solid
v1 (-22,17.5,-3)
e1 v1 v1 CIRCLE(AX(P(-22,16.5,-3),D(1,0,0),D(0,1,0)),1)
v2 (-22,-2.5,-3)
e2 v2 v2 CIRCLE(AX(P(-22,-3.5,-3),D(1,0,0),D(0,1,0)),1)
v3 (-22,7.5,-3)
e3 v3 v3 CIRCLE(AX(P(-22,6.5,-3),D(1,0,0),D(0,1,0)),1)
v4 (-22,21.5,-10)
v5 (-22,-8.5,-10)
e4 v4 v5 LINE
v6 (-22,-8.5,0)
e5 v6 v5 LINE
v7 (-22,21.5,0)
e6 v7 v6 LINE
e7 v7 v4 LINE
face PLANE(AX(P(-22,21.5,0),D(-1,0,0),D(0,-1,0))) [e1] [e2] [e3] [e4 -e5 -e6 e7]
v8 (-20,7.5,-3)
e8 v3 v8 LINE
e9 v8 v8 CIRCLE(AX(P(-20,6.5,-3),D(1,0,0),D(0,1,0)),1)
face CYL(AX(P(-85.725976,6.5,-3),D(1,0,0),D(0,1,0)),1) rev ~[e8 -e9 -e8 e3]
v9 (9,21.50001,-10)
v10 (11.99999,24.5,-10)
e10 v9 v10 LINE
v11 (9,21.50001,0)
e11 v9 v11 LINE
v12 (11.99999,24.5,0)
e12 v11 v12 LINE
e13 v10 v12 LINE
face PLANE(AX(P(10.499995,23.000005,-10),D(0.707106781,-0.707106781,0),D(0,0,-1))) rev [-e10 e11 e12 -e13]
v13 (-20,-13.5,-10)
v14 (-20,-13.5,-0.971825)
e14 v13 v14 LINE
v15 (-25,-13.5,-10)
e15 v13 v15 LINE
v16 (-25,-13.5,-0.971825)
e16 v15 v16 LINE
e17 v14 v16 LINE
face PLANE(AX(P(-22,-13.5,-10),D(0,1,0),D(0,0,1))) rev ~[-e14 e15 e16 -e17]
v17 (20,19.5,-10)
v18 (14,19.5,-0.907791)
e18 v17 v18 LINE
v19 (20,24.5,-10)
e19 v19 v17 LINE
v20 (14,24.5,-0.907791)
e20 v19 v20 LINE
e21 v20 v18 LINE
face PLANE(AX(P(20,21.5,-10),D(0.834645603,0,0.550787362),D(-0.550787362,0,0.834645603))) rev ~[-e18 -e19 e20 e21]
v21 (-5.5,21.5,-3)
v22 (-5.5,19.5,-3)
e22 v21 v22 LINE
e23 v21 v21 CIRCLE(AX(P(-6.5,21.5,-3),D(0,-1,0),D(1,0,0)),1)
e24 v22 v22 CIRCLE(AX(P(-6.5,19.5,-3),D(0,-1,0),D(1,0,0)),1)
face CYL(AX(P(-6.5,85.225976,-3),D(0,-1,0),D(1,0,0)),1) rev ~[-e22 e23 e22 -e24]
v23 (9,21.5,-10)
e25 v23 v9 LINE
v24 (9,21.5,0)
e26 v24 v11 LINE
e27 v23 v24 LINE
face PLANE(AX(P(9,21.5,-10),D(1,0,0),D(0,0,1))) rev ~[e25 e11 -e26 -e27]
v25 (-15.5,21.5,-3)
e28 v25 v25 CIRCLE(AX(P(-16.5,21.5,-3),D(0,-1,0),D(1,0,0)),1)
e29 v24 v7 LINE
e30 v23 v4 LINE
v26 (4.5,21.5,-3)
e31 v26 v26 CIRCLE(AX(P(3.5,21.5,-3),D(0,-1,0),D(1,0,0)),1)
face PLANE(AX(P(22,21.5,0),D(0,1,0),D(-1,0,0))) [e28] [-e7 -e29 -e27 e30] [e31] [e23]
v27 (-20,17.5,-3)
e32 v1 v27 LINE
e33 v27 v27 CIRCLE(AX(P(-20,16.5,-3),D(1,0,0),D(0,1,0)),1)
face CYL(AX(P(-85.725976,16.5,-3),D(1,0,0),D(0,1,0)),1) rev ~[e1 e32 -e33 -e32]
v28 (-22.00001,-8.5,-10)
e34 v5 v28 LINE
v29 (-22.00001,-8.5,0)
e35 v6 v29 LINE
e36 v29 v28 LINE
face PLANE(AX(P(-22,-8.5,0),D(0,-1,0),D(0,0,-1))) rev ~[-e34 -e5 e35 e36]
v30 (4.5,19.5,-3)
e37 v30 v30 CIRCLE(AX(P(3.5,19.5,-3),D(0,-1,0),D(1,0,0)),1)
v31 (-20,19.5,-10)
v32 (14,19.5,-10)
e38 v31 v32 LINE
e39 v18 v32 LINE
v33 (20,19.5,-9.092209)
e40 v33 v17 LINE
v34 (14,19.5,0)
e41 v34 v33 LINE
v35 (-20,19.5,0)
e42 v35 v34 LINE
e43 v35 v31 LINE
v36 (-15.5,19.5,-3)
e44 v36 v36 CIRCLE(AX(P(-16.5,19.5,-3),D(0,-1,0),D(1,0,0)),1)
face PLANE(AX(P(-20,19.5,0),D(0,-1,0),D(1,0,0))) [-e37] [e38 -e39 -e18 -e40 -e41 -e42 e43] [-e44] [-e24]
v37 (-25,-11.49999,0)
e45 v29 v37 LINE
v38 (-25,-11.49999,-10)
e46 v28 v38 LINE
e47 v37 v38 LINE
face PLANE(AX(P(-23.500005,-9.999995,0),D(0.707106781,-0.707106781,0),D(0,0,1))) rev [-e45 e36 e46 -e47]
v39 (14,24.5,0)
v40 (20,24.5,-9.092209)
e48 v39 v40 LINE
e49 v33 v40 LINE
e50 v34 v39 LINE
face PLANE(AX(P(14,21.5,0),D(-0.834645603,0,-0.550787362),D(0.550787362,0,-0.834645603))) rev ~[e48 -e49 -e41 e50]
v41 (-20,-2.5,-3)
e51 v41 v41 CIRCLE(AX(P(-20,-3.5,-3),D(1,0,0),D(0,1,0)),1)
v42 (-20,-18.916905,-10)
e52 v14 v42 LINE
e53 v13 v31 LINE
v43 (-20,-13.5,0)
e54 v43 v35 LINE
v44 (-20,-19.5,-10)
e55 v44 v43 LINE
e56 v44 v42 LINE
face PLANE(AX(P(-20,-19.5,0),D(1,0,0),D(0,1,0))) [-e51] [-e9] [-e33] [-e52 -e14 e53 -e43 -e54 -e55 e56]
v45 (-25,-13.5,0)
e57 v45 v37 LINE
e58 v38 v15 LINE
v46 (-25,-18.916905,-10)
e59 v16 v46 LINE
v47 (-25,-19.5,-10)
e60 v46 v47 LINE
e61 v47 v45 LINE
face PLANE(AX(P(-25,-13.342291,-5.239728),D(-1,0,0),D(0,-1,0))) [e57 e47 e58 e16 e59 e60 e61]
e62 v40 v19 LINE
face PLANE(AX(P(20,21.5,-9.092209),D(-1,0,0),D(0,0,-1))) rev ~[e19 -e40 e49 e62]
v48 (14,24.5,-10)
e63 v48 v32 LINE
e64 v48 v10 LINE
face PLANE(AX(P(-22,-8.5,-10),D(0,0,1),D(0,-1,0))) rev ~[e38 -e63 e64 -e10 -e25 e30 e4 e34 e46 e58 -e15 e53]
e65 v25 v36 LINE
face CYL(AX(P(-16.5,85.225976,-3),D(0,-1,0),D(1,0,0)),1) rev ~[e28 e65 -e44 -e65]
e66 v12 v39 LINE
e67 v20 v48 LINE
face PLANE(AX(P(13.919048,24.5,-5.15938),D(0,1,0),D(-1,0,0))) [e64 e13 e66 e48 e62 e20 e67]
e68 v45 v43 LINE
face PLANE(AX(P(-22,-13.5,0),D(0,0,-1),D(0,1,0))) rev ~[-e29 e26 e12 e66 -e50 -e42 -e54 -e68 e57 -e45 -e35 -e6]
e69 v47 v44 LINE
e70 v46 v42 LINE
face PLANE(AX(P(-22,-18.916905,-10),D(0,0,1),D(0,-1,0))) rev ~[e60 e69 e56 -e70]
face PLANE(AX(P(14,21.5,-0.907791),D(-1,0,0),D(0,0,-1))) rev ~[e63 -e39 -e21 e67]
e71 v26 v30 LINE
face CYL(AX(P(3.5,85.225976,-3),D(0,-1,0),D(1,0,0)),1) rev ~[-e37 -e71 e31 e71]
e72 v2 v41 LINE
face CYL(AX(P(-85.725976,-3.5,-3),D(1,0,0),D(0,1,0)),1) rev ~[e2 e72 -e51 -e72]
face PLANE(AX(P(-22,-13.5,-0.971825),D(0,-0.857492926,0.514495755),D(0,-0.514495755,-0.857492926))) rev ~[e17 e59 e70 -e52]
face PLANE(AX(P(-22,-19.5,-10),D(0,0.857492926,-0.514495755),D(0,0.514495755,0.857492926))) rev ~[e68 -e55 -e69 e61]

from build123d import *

# Parameters (mm, degrees)
F1_DEPTH  = 10
F2_W      = 2
F2_H      = 10
F3_DEPTH  = 25
F4_DEPTH  = 44.001
F6_DEPTH  = 41.001
F9_DEPTH  = 3
F10_SIZE  = 2.99999
F12_DEPTH = 3
F13_SIZE  = 2.99999
F16_D     = 2
F17_D     = 2


# Not quite as in the source:
# - a fillet or chamfer is up to 0.001 mm smaller than in the source, because OpenCascade refuses the exact size
# - a feature of the source that left no trace in its solid (it failed there, or was rolled back) is left out


with BuildPart() as f1:
    # F0 (on Top) → F1 (new body)
    with BuildSketch(Plane.XY):
        Polygon((-22, -19.5), (-20, -19.5), (-20, 19.5), (20, 19.5), (20, 21.5), (-22, 21.5), align=None)
        Polygon((20, 19.5), (20, -19.5), (-20, -19.5), (-22, -19.5), (-22, -21.5), (22, -21.5), (22, 21.5), (20, 21.5), align=None)
    extrude(amount=-F1_DEPTH)

    # F2 (on face) → F3 (cut)
    with BuildSketch(Plane(origin=(-22, 0, 0), x_dir=(0, -1, 0), z_dir=(-1, 0, 0))):
        with Locations((20.5, -5)):
            Rectangle(F2_W, F2_H)
        Polygon((13.5, -10), (18.9169048105, -10), (13.5, -0.9718253158), align=None)
    extrude(amount=-F3_DEPTH, mode=Mode.SUBTRACT)

    # F2 (on face) → F4 (cut, through all)
    with BuildSketch(Plane(origin=(-22, 0, 0), x_dir=(0, -1, 0), z_dir=(-1, 0, 0))):
        Polygon((19.5, 0), (13.5, 0), (19.5, -10), align=None)
        with Locations((20.5, -5)):
            Rectangle(F2_W, F2_H)
    extrude(amount=-F4_DEPTH, mode=Mode.SUBTRACT)

    # F5 (on face) → F6 (cut, through all)
    with BuildSketch(Plane(origin=(0, 21.5, 0), x_dir=(-1, 0, 0), z_dir=(0, 1, 0))):
        Polygon((-14, -0.9077913453), (-20, -10), (-14, -10), align=None)
        Polygon((-22, -10), (-20, -10), (-20, -9.0922086547), (-14, 0), (-22, 0), align=None)
    extrude(amount=-F6_DEPTH, mode=Mode.SUBTRACT)

    # F8 (on face) → F9 (join)
    with BuildSketch(Plane(origin=(0, 21.5, 0), x_dir=(-1, 0, 0), z_dir=(0, 1, 0))):
        Polygon((-14, -10), (-9, -10), (-9, 0), (-14, 0), (-20, -9.0922086547), (-20, -10), (-14, -0.9077913453), align=None)
    extrude(amount=F9_DEPTH)

    # F10 (size 3 in the source; OpenCascade refuses exactly that, so slightly less here)
    f10_edges = [f1.edges().sort_by_distance(p)[0] for p in [
        (9, 24.5, -5),
    ]]
    chamfer(f10_edges, length=F10_SIZE)

    # F11 (on face) → F12 (join)
    with BuildSketch(Plane(origin=(-22, 0, 0), x_dir=(0, -1, 0), z_dir=(-1, 0, 0))):
        Polygon((13.5, 0), (8.5, 0), (8.5, -10), (13.5, -10), (13.5, -0.9718253158), (18.9169048105, -10), (19.5, -10), align=None)
    extrude(amount=F12_DEPTH)

    # F13 (size 3 in the source; OpenCascade refuses exactly that, so slightly less here)
    f13_edges = [f1.edges().sort_by_distance(p)[0] for p in [
        (-25, -8.5, -5),
    ]]
    chamfer(f13_edges, length=F13_SIZE)

    # F16 (through all)
    with Locations(Plane(origin=(-22, 0, 0), x_dir=(0, -1, 0), z_dir=(-1, 0, 0))):
        with Locations((-6.5, -3), (3.5, -3), (-16.5, -3)):
            Hole(F16_D / 2)

    # F17 (through all)
    with Locations(Plane(origin=(0, 21.5, 0), x_dir=(-1, 0, 0), z_dir=(0, 1, 0))):
        with Locations((-3.5, -3), (6.5, -3), (16.5, -3)):
            Hole(F17_D / 2)


solid = f1.part
